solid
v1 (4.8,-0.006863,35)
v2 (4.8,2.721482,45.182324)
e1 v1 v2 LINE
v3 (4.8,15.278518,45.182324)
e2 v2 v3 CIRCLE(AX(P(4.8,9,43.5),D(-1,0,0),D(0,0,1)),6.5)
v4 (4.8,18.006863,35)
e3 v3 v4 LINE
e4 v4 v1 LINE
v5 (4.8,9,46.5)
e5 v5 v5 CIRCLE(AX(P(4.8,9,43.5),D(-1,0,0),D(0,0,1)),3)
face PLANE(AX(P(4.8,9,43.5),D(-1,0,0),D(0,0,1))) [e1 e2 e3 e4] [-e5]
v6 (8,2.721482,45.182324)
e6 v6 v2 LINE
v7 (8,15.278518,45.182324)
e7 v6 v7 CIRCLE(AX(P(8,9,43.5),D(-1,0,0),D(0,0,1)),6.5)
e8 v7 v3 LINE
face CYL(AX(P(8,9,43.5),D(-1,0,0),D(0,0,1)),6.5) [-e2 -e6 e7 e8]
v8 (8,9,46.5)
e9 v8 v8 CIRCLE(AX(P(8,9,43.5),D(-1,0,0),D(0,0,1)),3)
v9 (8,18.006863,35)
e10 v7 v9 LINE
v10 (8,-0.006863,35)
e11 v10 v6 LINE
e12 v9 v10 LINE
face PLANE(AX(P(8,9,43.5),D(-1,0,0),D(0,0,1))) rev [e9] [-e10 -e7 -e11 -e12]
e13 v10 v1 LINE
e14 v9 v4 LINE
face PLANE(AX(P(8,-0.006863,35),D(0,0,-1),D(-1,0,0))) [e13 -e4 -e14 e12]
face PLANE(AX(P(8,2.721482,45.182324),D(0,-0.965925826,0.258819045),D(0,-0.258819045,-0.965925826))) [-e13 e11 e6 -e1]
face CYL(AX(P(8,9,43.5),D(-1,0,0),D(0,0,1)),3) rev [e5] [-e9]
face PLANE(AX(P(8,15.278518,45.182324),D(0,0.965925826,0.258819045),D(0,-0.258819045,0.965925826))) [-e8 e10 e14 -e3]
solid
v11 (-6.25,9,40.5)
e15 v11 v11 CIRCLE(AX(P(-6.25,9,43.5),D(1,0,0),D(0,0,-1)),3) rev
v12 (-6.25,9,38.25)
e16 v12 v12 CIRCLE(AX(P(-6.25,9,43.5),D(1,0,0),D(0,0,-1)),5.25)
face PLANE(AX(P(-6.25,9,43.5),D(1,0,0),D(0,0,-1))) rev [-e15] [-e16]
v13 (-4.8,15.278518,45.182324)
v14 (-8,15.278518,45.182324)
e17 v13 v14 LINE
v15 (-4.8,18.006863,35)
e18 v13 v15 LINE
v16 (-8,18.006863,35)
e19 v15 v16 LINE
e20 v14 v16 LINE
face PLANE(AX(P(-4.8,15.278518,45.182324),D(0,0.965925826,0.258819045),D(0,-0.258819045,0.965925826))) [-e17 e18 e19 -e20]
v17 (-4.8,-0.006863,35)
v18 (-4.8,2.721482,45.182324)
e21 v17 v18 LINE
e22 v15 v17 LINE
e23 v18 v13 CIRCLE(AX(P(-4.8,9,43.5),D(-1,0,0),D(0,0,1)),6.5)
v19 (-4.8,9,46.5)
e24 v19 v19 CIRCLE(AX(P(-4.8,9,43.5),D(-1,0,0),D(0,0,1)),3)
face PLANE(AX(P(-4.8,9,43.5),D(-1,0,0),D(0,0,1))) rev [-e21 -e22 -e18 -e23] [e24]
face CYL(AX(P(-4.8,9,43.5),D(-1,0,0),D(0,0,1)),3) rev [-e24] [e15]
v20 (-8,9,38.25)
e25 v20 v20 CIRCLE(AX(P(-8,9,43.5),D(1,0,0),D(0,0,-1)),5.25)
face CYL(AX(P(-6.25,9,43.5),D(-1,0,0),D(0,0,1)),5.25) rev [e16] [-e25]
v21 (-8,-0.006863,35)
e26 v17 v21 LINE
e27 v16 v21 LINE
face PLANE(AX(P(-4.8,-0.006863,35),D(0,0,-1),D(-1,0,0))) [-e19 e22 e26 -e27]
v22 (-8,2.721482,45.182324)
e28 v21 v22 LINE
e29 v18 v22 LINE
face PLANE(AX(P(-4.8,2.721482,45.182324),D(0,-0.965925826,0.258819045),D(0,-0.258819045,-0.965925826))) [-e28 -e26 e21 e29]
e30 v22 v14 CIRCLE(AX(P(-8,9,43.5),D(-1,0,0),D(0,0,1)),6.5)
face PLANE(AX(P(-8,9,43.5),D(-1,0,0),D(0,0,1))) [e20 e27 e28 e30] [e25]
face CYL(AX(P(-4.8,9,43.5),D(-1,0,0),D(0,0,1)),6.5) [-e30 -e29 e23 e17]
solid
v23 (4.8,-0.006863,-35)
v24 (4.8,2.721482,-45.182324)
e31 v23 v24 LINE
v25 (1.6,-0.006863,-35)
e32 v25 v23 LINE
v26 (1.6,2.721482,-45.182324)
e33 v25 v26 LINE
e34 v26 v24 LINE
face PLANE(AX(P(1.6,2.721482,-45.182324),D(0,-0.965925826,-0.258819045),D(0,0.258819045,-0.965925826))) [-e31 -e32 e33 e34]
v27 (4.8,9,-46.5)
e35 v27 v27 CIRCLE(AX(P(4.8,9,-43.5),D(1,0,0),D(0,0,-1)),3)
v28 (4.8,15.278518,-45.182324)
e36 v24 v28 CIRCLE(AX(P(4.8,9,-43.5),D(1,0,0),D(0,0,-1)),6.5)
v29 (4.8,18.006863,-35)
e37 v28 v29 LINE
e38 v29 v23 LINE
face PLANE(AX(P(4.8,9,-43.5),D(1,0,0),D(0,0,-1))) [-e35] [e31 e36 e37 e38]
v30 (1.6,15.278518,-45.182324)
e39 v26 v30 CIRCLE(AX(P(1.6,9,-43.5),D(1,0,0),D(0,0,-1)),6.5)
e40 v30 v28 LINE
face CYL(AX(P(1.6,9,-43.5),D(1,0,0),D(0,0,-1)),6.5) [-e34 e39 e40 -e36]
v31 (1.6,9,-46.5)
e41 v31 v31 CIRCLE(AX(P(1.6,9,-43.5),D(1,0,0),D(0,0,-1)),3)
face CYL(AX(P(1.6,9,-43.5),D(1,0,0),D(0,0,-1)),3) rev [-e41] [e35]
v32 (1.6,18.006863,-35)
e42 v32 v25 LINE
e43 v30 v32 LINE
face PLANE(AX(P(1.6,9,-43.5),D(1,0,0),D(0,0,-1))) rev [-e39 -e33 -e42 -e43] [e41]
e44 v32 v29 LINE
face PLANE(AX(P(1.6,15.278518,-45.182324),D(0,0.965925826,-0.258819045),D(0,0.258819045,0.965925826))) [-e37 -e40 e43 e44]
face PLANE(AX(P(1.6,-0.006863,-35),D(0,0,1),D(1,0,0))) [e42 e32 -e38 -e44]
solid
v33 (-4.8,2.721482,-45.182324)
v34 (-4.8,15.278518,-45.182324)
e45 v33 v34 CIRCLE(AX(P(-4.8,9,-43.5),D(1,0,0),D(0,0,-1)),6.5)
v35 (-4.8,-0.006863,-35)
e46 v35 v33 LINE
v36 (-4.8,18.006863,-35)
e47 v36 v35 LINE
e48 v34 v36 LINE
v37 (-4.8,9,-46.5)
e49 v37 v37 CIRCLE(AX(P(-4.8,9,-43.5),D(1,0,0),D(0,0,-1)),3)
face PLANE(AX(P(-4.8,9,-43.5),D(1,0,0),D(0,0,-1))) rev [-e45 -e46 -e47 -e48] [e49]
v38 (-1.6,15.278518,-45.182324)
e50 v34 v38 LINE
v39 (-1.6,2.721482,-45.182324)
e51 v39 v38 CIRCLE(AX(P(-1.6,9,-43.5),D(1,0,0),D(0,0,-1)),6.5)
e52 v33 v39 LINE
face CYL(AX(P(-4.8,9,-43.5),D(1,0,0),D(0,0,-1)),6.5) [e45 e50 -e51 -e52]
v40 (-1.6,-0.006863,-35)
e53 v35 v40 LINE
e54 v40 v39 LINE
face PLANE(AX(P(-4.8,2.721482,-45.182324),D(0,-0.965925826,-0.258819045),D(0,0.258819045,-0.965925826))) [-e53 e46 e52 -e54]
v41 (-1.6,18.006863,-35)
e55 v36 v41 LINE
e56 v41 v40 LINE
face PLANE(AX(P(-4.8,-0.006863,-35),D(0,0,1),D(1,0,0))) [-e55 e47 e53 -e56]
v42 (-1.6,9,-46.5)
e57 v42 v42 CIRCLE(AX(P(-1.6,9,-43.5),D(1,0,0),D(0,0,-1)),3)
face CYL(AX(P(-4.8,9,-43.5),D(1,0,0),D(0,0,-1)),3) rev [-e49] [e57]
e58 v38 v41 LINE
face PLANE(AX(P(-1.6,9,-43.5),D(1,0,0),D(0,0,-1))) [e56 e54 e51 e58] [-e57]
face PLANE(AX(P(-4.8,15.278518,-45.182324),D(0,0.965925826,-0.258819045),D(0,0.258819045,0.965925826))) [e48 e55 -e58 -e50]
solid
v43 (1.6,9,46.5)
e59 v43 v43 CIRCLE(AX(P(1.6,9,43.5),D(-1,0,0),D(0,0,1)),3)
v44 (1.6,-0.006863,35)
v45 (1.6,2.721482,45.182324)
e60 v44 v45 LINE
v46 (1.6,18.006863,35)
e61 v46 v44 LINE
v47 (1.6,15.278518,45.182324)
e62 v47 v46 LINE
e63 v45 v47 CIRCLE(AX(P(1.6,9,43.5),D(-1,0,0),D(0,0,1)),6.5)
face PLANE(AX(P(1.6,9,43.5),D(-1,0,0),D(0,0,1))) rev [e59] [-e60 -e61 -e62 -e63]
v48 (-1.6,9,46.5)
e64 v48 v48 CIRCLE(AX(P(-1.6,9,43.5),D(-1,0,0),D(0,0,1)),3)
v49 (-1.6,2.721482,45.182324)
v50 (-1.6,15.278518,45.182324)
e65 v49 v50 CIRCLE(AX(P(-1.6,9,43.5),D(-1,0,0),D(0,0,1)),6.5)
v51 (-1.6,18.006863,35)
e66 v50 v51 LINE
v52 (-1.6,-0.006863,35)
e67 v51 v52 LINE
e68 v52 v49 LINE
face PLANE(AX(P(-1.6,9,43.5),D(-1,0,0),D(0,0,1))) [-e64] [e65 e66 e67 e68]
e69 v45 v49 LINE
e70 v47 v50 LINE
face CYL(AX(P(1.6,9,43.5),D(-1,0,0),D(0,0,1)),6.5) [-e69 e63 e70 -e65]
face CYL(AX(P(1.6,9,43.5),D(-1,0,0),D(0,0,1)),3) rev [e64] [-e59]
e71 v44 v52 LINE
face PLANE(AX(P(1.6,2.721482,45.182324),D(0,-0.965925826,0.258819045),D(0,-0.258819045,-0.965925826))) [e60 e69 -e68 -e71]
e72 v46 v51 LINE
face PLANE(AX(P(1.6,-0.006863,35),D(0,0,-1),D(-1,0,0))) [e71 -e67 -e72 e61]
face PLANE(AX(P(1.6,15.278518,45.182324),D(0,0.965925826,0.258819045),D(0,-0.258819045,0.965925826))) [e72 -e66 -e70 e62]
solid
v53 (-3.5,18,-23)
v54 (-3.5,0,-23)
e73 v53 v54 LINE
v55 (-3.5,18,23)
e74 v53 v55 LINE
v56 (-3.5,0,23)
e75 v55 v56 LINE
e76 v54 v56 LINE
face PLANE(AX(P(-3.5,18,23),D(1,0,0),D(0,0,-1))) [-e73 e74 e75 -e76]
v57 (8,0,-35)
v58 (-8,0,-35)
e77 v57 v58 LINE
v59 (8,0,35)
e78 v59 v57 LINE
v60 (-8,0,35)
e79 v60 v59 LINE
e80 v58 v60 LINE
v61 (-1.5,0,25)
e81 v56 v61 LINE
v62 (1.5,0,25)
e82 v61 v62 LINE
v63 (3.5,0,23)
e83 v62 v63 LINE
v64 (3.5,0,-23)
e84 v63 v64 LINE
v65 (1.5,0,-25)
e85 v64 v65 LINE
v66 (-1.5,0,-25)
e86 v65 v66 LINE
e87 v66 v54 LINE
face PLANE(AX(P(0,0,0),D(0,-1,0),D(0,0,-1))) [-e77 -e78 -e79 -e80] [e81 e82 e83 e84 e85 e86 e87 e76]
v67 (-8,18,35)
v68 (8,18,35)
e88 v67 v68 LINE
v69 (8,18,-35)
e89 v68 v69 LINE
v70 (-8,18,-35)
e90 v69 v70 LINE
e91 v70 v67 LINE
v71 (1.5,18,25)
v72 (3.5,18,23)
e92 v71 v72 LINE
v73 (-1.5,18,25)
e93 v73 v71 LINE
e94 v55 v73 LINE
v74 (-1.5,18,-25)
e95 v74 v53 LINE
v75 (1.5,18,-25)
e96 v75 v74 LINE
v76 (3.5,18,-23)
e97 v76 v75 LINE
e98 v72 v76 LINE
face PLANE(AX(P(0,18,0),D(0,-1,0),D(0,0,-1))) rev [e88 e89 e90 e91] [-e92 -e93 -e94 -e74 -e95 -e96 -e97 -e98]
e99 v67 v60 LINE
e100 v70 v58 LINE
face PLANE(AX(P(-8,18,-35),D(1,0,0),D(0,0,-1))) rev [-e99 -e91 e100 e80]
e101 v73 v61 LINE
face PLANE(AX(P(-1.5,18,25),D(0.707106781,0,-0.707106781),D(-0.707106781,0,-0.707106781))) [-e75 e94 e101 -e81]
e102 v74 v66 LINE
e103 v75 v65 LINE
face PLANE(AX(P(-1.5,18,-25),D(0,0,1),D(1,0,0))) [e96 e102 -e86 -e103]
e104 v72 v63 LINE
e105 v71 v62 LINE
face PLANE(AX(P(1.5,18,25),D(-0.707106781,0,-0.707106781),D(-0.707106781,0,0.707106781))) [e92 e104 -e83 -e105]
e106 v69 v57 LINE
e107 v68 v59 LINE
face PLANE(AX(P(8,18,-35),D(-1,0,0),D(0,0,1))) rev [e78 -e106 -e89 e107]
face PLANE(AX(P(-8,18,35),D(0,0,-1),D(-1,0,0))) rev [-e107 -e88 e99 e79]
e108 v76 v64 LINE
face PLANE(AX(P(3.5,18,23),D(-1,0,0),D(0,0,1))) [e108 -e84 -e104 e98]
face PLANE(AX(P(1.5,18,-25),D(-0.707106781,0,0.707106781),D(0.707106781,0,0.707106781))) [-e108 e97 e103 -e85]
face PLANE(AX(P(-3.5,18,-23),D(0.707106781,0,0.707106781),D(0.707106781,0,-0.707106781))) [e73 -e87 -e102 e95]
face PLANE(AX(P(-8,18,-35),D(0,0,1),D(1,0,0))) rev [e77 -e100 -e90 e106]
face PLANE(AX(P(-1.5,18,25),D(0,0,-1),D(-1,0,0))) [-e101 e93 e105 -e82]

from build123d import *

# Parameters (mm, degrees)
SKETCH1_W                   = 16
SKETCH1_H                   = 70
BOSS_EXTRUDE1_DEPTH         = 18
SKETCH2_R                   = 3
BOSS_EXTRUDE2_DEPTH         = 3.2
SKETCH3_R                   = 3
BOSS_EXTRUDE3_DEPTH         = 3.2
BODY_MOVE_COPY2_START       = -1.6
BODY_MOVE_COPY2_OUTLINE_R   = 3
BODY_MOVE_COPY2_DEPTH       = 3.2
BODY_MOVE_COPY2_START_2     = 4.8
BODY_MOVE_COPY2_2_OUTLINE_R = 3
BODY_MOVE_COPY2_2_DEPTH     = 3.2
SKETCH4_R                   = 5.25
CUT_EXTRUDE1_DEPTH          = 1.75


# Read off the part's stored shape, not the designer's step: Body-Move/Copy2
with BuildPart() as part:
    # Sketch1 → Boss-Extrude1 (new body)
    with BuildSketch(Plane(origin=(0, 0, 0), x_dir=(1, 0, 0), z_dir=(0, 1, 0))):
        Rectangle(SKETCH1_W, SKETCH1_H)
        Polygon((-3.5, 23), (-1.5, 25), (1.5, 25), (3.5, 23), (3.5, -23), (1.5, -25), (-1.5, -25), (-3.5, -23), align=None, mode=Mode.SUBTRACT)
    extrude(amount=BOSS_EXTRUDE1_DEPTH)


with BuildPart() as body_2:
    # Sketch2 → Boss-Extrude2 (new body)
    with BuildSketch(Plane(origin=(4.8, 0, 0), x_dir=(0, 0, -1), z_dir=(1, 0, 0))):
        with BuildLine():
            Line((45.182323793, 2.721482129), (35, -0.006863308))
            Line((35, -0.006863308), (35, 18.006863308))
            Line((35, 18.006863308), (45.182323793, 15.278517871))
            ThreePointArc((45.182323793, 15.278517871), (50, 9), (45.182323793, 2.721482129))
        make_face()
        with Locations((43.5, 9)):
            Circle(SKETCH2_R, mode=Mode.SUBTRACT)
    extrude(amount=-BOSS_EXTRUDE2_DEPTH)


with BuildPart() as body_3:
    # Body-Move/Copy1: copy of body 2
    add(body_2.part.moved(Location((-6.4, 0, 0))))


with BuildPart() as body_4:
    # Sketch3 → Boss-Extrude3 (new body)
    with BuildSketch(Plane.ZY.offset(8)):
        with BuildLine():
            Line((45.182323793, 15.278517871), (35, 18.006863308))
            Line((35, 18.006863308), (35, -0.006863308))
            Line((35, -0.006863308), (45.182323793, 2.721482129))
            ThreePointArc((45.182323793, 2.721482129), (50, 9), (45.182323793, 15.278517871))
        make_face()
        with Locations((43.5, 9)):
            Circle(SKETCH3_R, mode=Mode.SUBTRACT)
    extrude(amount=-BOSS_EXTRUDE3_DEPTH)

    # Sketch4 → Cut-Extrude1 (cut)
    with BuildSketch(Plane(origin=(-8, 0, 0), x_dir=(0, 0, -1), z_dir=(1, 0, 0))):
        with Locations((-43.5, 9)):
            Circle(SKETCH4_R)
    extrude(amount=CUT_EXTRUDE1_DEPTH, mode=Mode.SUBTRACT)


with BuildPart() as body_5:
    # Body-Move/Copy2 outline → Body-Move/Copy2 (new body)
    with BuildSketch(Plane.YZ.offset(BODY_MOVE_COPY2_START)):
        with BuildLine():
            ThreePointArc((15.278517871, 45.182323793), (9, 50), (2.721482129, 45.182323793))
            Line((2.721482129, 45.182323793), (-0.006863308, 35))
            Line((-0.006863308, 35), (18.006863308, 35))
            Line((18.006863308, 35), (15.278517871, 45.182323793))
        make_face()
        with Locations((9, 43.5)):
            Circle(BODY_MOVE_COPY2_OUTLINE_R, mode=Mode.SUBTRACT)
    extrude(amount=BODY_MOVE_COPY2_DEPTH)


with BuildPart() as body_6:
    # Body-Move_Copy2 2 outline → Body-Move_Copy2 2 (new body)
    with BuildSketch(Plane.YZ.offset(BODY_MOVE_COPY2_START_2)):
        with BuildLine():
            ThreePointArc((15.278517871, 45.182323793), (9, 50), (2.721482129, 45.182323793))
            Line((2.721482129, 45.182323793), (-0.006863308, 35))
            Line((-0.006863308, 35), (18.006863308, 35))
            Line((18.006863308, 35), (15.278517871, 45.182323793))
        make_face()
        with Locations((9, 43.5)):
            Circle(BODY_MOVE_COPY2_2_OUTLINE_R, mode=Mode.SUBTRACT)
    extrude(amount=BODY_MOVE_COPY2_2_DEPTH)


solid = Compound([part.part, body_2.part, body_3.part, body_4.part, body_5.part, body_6.part])
